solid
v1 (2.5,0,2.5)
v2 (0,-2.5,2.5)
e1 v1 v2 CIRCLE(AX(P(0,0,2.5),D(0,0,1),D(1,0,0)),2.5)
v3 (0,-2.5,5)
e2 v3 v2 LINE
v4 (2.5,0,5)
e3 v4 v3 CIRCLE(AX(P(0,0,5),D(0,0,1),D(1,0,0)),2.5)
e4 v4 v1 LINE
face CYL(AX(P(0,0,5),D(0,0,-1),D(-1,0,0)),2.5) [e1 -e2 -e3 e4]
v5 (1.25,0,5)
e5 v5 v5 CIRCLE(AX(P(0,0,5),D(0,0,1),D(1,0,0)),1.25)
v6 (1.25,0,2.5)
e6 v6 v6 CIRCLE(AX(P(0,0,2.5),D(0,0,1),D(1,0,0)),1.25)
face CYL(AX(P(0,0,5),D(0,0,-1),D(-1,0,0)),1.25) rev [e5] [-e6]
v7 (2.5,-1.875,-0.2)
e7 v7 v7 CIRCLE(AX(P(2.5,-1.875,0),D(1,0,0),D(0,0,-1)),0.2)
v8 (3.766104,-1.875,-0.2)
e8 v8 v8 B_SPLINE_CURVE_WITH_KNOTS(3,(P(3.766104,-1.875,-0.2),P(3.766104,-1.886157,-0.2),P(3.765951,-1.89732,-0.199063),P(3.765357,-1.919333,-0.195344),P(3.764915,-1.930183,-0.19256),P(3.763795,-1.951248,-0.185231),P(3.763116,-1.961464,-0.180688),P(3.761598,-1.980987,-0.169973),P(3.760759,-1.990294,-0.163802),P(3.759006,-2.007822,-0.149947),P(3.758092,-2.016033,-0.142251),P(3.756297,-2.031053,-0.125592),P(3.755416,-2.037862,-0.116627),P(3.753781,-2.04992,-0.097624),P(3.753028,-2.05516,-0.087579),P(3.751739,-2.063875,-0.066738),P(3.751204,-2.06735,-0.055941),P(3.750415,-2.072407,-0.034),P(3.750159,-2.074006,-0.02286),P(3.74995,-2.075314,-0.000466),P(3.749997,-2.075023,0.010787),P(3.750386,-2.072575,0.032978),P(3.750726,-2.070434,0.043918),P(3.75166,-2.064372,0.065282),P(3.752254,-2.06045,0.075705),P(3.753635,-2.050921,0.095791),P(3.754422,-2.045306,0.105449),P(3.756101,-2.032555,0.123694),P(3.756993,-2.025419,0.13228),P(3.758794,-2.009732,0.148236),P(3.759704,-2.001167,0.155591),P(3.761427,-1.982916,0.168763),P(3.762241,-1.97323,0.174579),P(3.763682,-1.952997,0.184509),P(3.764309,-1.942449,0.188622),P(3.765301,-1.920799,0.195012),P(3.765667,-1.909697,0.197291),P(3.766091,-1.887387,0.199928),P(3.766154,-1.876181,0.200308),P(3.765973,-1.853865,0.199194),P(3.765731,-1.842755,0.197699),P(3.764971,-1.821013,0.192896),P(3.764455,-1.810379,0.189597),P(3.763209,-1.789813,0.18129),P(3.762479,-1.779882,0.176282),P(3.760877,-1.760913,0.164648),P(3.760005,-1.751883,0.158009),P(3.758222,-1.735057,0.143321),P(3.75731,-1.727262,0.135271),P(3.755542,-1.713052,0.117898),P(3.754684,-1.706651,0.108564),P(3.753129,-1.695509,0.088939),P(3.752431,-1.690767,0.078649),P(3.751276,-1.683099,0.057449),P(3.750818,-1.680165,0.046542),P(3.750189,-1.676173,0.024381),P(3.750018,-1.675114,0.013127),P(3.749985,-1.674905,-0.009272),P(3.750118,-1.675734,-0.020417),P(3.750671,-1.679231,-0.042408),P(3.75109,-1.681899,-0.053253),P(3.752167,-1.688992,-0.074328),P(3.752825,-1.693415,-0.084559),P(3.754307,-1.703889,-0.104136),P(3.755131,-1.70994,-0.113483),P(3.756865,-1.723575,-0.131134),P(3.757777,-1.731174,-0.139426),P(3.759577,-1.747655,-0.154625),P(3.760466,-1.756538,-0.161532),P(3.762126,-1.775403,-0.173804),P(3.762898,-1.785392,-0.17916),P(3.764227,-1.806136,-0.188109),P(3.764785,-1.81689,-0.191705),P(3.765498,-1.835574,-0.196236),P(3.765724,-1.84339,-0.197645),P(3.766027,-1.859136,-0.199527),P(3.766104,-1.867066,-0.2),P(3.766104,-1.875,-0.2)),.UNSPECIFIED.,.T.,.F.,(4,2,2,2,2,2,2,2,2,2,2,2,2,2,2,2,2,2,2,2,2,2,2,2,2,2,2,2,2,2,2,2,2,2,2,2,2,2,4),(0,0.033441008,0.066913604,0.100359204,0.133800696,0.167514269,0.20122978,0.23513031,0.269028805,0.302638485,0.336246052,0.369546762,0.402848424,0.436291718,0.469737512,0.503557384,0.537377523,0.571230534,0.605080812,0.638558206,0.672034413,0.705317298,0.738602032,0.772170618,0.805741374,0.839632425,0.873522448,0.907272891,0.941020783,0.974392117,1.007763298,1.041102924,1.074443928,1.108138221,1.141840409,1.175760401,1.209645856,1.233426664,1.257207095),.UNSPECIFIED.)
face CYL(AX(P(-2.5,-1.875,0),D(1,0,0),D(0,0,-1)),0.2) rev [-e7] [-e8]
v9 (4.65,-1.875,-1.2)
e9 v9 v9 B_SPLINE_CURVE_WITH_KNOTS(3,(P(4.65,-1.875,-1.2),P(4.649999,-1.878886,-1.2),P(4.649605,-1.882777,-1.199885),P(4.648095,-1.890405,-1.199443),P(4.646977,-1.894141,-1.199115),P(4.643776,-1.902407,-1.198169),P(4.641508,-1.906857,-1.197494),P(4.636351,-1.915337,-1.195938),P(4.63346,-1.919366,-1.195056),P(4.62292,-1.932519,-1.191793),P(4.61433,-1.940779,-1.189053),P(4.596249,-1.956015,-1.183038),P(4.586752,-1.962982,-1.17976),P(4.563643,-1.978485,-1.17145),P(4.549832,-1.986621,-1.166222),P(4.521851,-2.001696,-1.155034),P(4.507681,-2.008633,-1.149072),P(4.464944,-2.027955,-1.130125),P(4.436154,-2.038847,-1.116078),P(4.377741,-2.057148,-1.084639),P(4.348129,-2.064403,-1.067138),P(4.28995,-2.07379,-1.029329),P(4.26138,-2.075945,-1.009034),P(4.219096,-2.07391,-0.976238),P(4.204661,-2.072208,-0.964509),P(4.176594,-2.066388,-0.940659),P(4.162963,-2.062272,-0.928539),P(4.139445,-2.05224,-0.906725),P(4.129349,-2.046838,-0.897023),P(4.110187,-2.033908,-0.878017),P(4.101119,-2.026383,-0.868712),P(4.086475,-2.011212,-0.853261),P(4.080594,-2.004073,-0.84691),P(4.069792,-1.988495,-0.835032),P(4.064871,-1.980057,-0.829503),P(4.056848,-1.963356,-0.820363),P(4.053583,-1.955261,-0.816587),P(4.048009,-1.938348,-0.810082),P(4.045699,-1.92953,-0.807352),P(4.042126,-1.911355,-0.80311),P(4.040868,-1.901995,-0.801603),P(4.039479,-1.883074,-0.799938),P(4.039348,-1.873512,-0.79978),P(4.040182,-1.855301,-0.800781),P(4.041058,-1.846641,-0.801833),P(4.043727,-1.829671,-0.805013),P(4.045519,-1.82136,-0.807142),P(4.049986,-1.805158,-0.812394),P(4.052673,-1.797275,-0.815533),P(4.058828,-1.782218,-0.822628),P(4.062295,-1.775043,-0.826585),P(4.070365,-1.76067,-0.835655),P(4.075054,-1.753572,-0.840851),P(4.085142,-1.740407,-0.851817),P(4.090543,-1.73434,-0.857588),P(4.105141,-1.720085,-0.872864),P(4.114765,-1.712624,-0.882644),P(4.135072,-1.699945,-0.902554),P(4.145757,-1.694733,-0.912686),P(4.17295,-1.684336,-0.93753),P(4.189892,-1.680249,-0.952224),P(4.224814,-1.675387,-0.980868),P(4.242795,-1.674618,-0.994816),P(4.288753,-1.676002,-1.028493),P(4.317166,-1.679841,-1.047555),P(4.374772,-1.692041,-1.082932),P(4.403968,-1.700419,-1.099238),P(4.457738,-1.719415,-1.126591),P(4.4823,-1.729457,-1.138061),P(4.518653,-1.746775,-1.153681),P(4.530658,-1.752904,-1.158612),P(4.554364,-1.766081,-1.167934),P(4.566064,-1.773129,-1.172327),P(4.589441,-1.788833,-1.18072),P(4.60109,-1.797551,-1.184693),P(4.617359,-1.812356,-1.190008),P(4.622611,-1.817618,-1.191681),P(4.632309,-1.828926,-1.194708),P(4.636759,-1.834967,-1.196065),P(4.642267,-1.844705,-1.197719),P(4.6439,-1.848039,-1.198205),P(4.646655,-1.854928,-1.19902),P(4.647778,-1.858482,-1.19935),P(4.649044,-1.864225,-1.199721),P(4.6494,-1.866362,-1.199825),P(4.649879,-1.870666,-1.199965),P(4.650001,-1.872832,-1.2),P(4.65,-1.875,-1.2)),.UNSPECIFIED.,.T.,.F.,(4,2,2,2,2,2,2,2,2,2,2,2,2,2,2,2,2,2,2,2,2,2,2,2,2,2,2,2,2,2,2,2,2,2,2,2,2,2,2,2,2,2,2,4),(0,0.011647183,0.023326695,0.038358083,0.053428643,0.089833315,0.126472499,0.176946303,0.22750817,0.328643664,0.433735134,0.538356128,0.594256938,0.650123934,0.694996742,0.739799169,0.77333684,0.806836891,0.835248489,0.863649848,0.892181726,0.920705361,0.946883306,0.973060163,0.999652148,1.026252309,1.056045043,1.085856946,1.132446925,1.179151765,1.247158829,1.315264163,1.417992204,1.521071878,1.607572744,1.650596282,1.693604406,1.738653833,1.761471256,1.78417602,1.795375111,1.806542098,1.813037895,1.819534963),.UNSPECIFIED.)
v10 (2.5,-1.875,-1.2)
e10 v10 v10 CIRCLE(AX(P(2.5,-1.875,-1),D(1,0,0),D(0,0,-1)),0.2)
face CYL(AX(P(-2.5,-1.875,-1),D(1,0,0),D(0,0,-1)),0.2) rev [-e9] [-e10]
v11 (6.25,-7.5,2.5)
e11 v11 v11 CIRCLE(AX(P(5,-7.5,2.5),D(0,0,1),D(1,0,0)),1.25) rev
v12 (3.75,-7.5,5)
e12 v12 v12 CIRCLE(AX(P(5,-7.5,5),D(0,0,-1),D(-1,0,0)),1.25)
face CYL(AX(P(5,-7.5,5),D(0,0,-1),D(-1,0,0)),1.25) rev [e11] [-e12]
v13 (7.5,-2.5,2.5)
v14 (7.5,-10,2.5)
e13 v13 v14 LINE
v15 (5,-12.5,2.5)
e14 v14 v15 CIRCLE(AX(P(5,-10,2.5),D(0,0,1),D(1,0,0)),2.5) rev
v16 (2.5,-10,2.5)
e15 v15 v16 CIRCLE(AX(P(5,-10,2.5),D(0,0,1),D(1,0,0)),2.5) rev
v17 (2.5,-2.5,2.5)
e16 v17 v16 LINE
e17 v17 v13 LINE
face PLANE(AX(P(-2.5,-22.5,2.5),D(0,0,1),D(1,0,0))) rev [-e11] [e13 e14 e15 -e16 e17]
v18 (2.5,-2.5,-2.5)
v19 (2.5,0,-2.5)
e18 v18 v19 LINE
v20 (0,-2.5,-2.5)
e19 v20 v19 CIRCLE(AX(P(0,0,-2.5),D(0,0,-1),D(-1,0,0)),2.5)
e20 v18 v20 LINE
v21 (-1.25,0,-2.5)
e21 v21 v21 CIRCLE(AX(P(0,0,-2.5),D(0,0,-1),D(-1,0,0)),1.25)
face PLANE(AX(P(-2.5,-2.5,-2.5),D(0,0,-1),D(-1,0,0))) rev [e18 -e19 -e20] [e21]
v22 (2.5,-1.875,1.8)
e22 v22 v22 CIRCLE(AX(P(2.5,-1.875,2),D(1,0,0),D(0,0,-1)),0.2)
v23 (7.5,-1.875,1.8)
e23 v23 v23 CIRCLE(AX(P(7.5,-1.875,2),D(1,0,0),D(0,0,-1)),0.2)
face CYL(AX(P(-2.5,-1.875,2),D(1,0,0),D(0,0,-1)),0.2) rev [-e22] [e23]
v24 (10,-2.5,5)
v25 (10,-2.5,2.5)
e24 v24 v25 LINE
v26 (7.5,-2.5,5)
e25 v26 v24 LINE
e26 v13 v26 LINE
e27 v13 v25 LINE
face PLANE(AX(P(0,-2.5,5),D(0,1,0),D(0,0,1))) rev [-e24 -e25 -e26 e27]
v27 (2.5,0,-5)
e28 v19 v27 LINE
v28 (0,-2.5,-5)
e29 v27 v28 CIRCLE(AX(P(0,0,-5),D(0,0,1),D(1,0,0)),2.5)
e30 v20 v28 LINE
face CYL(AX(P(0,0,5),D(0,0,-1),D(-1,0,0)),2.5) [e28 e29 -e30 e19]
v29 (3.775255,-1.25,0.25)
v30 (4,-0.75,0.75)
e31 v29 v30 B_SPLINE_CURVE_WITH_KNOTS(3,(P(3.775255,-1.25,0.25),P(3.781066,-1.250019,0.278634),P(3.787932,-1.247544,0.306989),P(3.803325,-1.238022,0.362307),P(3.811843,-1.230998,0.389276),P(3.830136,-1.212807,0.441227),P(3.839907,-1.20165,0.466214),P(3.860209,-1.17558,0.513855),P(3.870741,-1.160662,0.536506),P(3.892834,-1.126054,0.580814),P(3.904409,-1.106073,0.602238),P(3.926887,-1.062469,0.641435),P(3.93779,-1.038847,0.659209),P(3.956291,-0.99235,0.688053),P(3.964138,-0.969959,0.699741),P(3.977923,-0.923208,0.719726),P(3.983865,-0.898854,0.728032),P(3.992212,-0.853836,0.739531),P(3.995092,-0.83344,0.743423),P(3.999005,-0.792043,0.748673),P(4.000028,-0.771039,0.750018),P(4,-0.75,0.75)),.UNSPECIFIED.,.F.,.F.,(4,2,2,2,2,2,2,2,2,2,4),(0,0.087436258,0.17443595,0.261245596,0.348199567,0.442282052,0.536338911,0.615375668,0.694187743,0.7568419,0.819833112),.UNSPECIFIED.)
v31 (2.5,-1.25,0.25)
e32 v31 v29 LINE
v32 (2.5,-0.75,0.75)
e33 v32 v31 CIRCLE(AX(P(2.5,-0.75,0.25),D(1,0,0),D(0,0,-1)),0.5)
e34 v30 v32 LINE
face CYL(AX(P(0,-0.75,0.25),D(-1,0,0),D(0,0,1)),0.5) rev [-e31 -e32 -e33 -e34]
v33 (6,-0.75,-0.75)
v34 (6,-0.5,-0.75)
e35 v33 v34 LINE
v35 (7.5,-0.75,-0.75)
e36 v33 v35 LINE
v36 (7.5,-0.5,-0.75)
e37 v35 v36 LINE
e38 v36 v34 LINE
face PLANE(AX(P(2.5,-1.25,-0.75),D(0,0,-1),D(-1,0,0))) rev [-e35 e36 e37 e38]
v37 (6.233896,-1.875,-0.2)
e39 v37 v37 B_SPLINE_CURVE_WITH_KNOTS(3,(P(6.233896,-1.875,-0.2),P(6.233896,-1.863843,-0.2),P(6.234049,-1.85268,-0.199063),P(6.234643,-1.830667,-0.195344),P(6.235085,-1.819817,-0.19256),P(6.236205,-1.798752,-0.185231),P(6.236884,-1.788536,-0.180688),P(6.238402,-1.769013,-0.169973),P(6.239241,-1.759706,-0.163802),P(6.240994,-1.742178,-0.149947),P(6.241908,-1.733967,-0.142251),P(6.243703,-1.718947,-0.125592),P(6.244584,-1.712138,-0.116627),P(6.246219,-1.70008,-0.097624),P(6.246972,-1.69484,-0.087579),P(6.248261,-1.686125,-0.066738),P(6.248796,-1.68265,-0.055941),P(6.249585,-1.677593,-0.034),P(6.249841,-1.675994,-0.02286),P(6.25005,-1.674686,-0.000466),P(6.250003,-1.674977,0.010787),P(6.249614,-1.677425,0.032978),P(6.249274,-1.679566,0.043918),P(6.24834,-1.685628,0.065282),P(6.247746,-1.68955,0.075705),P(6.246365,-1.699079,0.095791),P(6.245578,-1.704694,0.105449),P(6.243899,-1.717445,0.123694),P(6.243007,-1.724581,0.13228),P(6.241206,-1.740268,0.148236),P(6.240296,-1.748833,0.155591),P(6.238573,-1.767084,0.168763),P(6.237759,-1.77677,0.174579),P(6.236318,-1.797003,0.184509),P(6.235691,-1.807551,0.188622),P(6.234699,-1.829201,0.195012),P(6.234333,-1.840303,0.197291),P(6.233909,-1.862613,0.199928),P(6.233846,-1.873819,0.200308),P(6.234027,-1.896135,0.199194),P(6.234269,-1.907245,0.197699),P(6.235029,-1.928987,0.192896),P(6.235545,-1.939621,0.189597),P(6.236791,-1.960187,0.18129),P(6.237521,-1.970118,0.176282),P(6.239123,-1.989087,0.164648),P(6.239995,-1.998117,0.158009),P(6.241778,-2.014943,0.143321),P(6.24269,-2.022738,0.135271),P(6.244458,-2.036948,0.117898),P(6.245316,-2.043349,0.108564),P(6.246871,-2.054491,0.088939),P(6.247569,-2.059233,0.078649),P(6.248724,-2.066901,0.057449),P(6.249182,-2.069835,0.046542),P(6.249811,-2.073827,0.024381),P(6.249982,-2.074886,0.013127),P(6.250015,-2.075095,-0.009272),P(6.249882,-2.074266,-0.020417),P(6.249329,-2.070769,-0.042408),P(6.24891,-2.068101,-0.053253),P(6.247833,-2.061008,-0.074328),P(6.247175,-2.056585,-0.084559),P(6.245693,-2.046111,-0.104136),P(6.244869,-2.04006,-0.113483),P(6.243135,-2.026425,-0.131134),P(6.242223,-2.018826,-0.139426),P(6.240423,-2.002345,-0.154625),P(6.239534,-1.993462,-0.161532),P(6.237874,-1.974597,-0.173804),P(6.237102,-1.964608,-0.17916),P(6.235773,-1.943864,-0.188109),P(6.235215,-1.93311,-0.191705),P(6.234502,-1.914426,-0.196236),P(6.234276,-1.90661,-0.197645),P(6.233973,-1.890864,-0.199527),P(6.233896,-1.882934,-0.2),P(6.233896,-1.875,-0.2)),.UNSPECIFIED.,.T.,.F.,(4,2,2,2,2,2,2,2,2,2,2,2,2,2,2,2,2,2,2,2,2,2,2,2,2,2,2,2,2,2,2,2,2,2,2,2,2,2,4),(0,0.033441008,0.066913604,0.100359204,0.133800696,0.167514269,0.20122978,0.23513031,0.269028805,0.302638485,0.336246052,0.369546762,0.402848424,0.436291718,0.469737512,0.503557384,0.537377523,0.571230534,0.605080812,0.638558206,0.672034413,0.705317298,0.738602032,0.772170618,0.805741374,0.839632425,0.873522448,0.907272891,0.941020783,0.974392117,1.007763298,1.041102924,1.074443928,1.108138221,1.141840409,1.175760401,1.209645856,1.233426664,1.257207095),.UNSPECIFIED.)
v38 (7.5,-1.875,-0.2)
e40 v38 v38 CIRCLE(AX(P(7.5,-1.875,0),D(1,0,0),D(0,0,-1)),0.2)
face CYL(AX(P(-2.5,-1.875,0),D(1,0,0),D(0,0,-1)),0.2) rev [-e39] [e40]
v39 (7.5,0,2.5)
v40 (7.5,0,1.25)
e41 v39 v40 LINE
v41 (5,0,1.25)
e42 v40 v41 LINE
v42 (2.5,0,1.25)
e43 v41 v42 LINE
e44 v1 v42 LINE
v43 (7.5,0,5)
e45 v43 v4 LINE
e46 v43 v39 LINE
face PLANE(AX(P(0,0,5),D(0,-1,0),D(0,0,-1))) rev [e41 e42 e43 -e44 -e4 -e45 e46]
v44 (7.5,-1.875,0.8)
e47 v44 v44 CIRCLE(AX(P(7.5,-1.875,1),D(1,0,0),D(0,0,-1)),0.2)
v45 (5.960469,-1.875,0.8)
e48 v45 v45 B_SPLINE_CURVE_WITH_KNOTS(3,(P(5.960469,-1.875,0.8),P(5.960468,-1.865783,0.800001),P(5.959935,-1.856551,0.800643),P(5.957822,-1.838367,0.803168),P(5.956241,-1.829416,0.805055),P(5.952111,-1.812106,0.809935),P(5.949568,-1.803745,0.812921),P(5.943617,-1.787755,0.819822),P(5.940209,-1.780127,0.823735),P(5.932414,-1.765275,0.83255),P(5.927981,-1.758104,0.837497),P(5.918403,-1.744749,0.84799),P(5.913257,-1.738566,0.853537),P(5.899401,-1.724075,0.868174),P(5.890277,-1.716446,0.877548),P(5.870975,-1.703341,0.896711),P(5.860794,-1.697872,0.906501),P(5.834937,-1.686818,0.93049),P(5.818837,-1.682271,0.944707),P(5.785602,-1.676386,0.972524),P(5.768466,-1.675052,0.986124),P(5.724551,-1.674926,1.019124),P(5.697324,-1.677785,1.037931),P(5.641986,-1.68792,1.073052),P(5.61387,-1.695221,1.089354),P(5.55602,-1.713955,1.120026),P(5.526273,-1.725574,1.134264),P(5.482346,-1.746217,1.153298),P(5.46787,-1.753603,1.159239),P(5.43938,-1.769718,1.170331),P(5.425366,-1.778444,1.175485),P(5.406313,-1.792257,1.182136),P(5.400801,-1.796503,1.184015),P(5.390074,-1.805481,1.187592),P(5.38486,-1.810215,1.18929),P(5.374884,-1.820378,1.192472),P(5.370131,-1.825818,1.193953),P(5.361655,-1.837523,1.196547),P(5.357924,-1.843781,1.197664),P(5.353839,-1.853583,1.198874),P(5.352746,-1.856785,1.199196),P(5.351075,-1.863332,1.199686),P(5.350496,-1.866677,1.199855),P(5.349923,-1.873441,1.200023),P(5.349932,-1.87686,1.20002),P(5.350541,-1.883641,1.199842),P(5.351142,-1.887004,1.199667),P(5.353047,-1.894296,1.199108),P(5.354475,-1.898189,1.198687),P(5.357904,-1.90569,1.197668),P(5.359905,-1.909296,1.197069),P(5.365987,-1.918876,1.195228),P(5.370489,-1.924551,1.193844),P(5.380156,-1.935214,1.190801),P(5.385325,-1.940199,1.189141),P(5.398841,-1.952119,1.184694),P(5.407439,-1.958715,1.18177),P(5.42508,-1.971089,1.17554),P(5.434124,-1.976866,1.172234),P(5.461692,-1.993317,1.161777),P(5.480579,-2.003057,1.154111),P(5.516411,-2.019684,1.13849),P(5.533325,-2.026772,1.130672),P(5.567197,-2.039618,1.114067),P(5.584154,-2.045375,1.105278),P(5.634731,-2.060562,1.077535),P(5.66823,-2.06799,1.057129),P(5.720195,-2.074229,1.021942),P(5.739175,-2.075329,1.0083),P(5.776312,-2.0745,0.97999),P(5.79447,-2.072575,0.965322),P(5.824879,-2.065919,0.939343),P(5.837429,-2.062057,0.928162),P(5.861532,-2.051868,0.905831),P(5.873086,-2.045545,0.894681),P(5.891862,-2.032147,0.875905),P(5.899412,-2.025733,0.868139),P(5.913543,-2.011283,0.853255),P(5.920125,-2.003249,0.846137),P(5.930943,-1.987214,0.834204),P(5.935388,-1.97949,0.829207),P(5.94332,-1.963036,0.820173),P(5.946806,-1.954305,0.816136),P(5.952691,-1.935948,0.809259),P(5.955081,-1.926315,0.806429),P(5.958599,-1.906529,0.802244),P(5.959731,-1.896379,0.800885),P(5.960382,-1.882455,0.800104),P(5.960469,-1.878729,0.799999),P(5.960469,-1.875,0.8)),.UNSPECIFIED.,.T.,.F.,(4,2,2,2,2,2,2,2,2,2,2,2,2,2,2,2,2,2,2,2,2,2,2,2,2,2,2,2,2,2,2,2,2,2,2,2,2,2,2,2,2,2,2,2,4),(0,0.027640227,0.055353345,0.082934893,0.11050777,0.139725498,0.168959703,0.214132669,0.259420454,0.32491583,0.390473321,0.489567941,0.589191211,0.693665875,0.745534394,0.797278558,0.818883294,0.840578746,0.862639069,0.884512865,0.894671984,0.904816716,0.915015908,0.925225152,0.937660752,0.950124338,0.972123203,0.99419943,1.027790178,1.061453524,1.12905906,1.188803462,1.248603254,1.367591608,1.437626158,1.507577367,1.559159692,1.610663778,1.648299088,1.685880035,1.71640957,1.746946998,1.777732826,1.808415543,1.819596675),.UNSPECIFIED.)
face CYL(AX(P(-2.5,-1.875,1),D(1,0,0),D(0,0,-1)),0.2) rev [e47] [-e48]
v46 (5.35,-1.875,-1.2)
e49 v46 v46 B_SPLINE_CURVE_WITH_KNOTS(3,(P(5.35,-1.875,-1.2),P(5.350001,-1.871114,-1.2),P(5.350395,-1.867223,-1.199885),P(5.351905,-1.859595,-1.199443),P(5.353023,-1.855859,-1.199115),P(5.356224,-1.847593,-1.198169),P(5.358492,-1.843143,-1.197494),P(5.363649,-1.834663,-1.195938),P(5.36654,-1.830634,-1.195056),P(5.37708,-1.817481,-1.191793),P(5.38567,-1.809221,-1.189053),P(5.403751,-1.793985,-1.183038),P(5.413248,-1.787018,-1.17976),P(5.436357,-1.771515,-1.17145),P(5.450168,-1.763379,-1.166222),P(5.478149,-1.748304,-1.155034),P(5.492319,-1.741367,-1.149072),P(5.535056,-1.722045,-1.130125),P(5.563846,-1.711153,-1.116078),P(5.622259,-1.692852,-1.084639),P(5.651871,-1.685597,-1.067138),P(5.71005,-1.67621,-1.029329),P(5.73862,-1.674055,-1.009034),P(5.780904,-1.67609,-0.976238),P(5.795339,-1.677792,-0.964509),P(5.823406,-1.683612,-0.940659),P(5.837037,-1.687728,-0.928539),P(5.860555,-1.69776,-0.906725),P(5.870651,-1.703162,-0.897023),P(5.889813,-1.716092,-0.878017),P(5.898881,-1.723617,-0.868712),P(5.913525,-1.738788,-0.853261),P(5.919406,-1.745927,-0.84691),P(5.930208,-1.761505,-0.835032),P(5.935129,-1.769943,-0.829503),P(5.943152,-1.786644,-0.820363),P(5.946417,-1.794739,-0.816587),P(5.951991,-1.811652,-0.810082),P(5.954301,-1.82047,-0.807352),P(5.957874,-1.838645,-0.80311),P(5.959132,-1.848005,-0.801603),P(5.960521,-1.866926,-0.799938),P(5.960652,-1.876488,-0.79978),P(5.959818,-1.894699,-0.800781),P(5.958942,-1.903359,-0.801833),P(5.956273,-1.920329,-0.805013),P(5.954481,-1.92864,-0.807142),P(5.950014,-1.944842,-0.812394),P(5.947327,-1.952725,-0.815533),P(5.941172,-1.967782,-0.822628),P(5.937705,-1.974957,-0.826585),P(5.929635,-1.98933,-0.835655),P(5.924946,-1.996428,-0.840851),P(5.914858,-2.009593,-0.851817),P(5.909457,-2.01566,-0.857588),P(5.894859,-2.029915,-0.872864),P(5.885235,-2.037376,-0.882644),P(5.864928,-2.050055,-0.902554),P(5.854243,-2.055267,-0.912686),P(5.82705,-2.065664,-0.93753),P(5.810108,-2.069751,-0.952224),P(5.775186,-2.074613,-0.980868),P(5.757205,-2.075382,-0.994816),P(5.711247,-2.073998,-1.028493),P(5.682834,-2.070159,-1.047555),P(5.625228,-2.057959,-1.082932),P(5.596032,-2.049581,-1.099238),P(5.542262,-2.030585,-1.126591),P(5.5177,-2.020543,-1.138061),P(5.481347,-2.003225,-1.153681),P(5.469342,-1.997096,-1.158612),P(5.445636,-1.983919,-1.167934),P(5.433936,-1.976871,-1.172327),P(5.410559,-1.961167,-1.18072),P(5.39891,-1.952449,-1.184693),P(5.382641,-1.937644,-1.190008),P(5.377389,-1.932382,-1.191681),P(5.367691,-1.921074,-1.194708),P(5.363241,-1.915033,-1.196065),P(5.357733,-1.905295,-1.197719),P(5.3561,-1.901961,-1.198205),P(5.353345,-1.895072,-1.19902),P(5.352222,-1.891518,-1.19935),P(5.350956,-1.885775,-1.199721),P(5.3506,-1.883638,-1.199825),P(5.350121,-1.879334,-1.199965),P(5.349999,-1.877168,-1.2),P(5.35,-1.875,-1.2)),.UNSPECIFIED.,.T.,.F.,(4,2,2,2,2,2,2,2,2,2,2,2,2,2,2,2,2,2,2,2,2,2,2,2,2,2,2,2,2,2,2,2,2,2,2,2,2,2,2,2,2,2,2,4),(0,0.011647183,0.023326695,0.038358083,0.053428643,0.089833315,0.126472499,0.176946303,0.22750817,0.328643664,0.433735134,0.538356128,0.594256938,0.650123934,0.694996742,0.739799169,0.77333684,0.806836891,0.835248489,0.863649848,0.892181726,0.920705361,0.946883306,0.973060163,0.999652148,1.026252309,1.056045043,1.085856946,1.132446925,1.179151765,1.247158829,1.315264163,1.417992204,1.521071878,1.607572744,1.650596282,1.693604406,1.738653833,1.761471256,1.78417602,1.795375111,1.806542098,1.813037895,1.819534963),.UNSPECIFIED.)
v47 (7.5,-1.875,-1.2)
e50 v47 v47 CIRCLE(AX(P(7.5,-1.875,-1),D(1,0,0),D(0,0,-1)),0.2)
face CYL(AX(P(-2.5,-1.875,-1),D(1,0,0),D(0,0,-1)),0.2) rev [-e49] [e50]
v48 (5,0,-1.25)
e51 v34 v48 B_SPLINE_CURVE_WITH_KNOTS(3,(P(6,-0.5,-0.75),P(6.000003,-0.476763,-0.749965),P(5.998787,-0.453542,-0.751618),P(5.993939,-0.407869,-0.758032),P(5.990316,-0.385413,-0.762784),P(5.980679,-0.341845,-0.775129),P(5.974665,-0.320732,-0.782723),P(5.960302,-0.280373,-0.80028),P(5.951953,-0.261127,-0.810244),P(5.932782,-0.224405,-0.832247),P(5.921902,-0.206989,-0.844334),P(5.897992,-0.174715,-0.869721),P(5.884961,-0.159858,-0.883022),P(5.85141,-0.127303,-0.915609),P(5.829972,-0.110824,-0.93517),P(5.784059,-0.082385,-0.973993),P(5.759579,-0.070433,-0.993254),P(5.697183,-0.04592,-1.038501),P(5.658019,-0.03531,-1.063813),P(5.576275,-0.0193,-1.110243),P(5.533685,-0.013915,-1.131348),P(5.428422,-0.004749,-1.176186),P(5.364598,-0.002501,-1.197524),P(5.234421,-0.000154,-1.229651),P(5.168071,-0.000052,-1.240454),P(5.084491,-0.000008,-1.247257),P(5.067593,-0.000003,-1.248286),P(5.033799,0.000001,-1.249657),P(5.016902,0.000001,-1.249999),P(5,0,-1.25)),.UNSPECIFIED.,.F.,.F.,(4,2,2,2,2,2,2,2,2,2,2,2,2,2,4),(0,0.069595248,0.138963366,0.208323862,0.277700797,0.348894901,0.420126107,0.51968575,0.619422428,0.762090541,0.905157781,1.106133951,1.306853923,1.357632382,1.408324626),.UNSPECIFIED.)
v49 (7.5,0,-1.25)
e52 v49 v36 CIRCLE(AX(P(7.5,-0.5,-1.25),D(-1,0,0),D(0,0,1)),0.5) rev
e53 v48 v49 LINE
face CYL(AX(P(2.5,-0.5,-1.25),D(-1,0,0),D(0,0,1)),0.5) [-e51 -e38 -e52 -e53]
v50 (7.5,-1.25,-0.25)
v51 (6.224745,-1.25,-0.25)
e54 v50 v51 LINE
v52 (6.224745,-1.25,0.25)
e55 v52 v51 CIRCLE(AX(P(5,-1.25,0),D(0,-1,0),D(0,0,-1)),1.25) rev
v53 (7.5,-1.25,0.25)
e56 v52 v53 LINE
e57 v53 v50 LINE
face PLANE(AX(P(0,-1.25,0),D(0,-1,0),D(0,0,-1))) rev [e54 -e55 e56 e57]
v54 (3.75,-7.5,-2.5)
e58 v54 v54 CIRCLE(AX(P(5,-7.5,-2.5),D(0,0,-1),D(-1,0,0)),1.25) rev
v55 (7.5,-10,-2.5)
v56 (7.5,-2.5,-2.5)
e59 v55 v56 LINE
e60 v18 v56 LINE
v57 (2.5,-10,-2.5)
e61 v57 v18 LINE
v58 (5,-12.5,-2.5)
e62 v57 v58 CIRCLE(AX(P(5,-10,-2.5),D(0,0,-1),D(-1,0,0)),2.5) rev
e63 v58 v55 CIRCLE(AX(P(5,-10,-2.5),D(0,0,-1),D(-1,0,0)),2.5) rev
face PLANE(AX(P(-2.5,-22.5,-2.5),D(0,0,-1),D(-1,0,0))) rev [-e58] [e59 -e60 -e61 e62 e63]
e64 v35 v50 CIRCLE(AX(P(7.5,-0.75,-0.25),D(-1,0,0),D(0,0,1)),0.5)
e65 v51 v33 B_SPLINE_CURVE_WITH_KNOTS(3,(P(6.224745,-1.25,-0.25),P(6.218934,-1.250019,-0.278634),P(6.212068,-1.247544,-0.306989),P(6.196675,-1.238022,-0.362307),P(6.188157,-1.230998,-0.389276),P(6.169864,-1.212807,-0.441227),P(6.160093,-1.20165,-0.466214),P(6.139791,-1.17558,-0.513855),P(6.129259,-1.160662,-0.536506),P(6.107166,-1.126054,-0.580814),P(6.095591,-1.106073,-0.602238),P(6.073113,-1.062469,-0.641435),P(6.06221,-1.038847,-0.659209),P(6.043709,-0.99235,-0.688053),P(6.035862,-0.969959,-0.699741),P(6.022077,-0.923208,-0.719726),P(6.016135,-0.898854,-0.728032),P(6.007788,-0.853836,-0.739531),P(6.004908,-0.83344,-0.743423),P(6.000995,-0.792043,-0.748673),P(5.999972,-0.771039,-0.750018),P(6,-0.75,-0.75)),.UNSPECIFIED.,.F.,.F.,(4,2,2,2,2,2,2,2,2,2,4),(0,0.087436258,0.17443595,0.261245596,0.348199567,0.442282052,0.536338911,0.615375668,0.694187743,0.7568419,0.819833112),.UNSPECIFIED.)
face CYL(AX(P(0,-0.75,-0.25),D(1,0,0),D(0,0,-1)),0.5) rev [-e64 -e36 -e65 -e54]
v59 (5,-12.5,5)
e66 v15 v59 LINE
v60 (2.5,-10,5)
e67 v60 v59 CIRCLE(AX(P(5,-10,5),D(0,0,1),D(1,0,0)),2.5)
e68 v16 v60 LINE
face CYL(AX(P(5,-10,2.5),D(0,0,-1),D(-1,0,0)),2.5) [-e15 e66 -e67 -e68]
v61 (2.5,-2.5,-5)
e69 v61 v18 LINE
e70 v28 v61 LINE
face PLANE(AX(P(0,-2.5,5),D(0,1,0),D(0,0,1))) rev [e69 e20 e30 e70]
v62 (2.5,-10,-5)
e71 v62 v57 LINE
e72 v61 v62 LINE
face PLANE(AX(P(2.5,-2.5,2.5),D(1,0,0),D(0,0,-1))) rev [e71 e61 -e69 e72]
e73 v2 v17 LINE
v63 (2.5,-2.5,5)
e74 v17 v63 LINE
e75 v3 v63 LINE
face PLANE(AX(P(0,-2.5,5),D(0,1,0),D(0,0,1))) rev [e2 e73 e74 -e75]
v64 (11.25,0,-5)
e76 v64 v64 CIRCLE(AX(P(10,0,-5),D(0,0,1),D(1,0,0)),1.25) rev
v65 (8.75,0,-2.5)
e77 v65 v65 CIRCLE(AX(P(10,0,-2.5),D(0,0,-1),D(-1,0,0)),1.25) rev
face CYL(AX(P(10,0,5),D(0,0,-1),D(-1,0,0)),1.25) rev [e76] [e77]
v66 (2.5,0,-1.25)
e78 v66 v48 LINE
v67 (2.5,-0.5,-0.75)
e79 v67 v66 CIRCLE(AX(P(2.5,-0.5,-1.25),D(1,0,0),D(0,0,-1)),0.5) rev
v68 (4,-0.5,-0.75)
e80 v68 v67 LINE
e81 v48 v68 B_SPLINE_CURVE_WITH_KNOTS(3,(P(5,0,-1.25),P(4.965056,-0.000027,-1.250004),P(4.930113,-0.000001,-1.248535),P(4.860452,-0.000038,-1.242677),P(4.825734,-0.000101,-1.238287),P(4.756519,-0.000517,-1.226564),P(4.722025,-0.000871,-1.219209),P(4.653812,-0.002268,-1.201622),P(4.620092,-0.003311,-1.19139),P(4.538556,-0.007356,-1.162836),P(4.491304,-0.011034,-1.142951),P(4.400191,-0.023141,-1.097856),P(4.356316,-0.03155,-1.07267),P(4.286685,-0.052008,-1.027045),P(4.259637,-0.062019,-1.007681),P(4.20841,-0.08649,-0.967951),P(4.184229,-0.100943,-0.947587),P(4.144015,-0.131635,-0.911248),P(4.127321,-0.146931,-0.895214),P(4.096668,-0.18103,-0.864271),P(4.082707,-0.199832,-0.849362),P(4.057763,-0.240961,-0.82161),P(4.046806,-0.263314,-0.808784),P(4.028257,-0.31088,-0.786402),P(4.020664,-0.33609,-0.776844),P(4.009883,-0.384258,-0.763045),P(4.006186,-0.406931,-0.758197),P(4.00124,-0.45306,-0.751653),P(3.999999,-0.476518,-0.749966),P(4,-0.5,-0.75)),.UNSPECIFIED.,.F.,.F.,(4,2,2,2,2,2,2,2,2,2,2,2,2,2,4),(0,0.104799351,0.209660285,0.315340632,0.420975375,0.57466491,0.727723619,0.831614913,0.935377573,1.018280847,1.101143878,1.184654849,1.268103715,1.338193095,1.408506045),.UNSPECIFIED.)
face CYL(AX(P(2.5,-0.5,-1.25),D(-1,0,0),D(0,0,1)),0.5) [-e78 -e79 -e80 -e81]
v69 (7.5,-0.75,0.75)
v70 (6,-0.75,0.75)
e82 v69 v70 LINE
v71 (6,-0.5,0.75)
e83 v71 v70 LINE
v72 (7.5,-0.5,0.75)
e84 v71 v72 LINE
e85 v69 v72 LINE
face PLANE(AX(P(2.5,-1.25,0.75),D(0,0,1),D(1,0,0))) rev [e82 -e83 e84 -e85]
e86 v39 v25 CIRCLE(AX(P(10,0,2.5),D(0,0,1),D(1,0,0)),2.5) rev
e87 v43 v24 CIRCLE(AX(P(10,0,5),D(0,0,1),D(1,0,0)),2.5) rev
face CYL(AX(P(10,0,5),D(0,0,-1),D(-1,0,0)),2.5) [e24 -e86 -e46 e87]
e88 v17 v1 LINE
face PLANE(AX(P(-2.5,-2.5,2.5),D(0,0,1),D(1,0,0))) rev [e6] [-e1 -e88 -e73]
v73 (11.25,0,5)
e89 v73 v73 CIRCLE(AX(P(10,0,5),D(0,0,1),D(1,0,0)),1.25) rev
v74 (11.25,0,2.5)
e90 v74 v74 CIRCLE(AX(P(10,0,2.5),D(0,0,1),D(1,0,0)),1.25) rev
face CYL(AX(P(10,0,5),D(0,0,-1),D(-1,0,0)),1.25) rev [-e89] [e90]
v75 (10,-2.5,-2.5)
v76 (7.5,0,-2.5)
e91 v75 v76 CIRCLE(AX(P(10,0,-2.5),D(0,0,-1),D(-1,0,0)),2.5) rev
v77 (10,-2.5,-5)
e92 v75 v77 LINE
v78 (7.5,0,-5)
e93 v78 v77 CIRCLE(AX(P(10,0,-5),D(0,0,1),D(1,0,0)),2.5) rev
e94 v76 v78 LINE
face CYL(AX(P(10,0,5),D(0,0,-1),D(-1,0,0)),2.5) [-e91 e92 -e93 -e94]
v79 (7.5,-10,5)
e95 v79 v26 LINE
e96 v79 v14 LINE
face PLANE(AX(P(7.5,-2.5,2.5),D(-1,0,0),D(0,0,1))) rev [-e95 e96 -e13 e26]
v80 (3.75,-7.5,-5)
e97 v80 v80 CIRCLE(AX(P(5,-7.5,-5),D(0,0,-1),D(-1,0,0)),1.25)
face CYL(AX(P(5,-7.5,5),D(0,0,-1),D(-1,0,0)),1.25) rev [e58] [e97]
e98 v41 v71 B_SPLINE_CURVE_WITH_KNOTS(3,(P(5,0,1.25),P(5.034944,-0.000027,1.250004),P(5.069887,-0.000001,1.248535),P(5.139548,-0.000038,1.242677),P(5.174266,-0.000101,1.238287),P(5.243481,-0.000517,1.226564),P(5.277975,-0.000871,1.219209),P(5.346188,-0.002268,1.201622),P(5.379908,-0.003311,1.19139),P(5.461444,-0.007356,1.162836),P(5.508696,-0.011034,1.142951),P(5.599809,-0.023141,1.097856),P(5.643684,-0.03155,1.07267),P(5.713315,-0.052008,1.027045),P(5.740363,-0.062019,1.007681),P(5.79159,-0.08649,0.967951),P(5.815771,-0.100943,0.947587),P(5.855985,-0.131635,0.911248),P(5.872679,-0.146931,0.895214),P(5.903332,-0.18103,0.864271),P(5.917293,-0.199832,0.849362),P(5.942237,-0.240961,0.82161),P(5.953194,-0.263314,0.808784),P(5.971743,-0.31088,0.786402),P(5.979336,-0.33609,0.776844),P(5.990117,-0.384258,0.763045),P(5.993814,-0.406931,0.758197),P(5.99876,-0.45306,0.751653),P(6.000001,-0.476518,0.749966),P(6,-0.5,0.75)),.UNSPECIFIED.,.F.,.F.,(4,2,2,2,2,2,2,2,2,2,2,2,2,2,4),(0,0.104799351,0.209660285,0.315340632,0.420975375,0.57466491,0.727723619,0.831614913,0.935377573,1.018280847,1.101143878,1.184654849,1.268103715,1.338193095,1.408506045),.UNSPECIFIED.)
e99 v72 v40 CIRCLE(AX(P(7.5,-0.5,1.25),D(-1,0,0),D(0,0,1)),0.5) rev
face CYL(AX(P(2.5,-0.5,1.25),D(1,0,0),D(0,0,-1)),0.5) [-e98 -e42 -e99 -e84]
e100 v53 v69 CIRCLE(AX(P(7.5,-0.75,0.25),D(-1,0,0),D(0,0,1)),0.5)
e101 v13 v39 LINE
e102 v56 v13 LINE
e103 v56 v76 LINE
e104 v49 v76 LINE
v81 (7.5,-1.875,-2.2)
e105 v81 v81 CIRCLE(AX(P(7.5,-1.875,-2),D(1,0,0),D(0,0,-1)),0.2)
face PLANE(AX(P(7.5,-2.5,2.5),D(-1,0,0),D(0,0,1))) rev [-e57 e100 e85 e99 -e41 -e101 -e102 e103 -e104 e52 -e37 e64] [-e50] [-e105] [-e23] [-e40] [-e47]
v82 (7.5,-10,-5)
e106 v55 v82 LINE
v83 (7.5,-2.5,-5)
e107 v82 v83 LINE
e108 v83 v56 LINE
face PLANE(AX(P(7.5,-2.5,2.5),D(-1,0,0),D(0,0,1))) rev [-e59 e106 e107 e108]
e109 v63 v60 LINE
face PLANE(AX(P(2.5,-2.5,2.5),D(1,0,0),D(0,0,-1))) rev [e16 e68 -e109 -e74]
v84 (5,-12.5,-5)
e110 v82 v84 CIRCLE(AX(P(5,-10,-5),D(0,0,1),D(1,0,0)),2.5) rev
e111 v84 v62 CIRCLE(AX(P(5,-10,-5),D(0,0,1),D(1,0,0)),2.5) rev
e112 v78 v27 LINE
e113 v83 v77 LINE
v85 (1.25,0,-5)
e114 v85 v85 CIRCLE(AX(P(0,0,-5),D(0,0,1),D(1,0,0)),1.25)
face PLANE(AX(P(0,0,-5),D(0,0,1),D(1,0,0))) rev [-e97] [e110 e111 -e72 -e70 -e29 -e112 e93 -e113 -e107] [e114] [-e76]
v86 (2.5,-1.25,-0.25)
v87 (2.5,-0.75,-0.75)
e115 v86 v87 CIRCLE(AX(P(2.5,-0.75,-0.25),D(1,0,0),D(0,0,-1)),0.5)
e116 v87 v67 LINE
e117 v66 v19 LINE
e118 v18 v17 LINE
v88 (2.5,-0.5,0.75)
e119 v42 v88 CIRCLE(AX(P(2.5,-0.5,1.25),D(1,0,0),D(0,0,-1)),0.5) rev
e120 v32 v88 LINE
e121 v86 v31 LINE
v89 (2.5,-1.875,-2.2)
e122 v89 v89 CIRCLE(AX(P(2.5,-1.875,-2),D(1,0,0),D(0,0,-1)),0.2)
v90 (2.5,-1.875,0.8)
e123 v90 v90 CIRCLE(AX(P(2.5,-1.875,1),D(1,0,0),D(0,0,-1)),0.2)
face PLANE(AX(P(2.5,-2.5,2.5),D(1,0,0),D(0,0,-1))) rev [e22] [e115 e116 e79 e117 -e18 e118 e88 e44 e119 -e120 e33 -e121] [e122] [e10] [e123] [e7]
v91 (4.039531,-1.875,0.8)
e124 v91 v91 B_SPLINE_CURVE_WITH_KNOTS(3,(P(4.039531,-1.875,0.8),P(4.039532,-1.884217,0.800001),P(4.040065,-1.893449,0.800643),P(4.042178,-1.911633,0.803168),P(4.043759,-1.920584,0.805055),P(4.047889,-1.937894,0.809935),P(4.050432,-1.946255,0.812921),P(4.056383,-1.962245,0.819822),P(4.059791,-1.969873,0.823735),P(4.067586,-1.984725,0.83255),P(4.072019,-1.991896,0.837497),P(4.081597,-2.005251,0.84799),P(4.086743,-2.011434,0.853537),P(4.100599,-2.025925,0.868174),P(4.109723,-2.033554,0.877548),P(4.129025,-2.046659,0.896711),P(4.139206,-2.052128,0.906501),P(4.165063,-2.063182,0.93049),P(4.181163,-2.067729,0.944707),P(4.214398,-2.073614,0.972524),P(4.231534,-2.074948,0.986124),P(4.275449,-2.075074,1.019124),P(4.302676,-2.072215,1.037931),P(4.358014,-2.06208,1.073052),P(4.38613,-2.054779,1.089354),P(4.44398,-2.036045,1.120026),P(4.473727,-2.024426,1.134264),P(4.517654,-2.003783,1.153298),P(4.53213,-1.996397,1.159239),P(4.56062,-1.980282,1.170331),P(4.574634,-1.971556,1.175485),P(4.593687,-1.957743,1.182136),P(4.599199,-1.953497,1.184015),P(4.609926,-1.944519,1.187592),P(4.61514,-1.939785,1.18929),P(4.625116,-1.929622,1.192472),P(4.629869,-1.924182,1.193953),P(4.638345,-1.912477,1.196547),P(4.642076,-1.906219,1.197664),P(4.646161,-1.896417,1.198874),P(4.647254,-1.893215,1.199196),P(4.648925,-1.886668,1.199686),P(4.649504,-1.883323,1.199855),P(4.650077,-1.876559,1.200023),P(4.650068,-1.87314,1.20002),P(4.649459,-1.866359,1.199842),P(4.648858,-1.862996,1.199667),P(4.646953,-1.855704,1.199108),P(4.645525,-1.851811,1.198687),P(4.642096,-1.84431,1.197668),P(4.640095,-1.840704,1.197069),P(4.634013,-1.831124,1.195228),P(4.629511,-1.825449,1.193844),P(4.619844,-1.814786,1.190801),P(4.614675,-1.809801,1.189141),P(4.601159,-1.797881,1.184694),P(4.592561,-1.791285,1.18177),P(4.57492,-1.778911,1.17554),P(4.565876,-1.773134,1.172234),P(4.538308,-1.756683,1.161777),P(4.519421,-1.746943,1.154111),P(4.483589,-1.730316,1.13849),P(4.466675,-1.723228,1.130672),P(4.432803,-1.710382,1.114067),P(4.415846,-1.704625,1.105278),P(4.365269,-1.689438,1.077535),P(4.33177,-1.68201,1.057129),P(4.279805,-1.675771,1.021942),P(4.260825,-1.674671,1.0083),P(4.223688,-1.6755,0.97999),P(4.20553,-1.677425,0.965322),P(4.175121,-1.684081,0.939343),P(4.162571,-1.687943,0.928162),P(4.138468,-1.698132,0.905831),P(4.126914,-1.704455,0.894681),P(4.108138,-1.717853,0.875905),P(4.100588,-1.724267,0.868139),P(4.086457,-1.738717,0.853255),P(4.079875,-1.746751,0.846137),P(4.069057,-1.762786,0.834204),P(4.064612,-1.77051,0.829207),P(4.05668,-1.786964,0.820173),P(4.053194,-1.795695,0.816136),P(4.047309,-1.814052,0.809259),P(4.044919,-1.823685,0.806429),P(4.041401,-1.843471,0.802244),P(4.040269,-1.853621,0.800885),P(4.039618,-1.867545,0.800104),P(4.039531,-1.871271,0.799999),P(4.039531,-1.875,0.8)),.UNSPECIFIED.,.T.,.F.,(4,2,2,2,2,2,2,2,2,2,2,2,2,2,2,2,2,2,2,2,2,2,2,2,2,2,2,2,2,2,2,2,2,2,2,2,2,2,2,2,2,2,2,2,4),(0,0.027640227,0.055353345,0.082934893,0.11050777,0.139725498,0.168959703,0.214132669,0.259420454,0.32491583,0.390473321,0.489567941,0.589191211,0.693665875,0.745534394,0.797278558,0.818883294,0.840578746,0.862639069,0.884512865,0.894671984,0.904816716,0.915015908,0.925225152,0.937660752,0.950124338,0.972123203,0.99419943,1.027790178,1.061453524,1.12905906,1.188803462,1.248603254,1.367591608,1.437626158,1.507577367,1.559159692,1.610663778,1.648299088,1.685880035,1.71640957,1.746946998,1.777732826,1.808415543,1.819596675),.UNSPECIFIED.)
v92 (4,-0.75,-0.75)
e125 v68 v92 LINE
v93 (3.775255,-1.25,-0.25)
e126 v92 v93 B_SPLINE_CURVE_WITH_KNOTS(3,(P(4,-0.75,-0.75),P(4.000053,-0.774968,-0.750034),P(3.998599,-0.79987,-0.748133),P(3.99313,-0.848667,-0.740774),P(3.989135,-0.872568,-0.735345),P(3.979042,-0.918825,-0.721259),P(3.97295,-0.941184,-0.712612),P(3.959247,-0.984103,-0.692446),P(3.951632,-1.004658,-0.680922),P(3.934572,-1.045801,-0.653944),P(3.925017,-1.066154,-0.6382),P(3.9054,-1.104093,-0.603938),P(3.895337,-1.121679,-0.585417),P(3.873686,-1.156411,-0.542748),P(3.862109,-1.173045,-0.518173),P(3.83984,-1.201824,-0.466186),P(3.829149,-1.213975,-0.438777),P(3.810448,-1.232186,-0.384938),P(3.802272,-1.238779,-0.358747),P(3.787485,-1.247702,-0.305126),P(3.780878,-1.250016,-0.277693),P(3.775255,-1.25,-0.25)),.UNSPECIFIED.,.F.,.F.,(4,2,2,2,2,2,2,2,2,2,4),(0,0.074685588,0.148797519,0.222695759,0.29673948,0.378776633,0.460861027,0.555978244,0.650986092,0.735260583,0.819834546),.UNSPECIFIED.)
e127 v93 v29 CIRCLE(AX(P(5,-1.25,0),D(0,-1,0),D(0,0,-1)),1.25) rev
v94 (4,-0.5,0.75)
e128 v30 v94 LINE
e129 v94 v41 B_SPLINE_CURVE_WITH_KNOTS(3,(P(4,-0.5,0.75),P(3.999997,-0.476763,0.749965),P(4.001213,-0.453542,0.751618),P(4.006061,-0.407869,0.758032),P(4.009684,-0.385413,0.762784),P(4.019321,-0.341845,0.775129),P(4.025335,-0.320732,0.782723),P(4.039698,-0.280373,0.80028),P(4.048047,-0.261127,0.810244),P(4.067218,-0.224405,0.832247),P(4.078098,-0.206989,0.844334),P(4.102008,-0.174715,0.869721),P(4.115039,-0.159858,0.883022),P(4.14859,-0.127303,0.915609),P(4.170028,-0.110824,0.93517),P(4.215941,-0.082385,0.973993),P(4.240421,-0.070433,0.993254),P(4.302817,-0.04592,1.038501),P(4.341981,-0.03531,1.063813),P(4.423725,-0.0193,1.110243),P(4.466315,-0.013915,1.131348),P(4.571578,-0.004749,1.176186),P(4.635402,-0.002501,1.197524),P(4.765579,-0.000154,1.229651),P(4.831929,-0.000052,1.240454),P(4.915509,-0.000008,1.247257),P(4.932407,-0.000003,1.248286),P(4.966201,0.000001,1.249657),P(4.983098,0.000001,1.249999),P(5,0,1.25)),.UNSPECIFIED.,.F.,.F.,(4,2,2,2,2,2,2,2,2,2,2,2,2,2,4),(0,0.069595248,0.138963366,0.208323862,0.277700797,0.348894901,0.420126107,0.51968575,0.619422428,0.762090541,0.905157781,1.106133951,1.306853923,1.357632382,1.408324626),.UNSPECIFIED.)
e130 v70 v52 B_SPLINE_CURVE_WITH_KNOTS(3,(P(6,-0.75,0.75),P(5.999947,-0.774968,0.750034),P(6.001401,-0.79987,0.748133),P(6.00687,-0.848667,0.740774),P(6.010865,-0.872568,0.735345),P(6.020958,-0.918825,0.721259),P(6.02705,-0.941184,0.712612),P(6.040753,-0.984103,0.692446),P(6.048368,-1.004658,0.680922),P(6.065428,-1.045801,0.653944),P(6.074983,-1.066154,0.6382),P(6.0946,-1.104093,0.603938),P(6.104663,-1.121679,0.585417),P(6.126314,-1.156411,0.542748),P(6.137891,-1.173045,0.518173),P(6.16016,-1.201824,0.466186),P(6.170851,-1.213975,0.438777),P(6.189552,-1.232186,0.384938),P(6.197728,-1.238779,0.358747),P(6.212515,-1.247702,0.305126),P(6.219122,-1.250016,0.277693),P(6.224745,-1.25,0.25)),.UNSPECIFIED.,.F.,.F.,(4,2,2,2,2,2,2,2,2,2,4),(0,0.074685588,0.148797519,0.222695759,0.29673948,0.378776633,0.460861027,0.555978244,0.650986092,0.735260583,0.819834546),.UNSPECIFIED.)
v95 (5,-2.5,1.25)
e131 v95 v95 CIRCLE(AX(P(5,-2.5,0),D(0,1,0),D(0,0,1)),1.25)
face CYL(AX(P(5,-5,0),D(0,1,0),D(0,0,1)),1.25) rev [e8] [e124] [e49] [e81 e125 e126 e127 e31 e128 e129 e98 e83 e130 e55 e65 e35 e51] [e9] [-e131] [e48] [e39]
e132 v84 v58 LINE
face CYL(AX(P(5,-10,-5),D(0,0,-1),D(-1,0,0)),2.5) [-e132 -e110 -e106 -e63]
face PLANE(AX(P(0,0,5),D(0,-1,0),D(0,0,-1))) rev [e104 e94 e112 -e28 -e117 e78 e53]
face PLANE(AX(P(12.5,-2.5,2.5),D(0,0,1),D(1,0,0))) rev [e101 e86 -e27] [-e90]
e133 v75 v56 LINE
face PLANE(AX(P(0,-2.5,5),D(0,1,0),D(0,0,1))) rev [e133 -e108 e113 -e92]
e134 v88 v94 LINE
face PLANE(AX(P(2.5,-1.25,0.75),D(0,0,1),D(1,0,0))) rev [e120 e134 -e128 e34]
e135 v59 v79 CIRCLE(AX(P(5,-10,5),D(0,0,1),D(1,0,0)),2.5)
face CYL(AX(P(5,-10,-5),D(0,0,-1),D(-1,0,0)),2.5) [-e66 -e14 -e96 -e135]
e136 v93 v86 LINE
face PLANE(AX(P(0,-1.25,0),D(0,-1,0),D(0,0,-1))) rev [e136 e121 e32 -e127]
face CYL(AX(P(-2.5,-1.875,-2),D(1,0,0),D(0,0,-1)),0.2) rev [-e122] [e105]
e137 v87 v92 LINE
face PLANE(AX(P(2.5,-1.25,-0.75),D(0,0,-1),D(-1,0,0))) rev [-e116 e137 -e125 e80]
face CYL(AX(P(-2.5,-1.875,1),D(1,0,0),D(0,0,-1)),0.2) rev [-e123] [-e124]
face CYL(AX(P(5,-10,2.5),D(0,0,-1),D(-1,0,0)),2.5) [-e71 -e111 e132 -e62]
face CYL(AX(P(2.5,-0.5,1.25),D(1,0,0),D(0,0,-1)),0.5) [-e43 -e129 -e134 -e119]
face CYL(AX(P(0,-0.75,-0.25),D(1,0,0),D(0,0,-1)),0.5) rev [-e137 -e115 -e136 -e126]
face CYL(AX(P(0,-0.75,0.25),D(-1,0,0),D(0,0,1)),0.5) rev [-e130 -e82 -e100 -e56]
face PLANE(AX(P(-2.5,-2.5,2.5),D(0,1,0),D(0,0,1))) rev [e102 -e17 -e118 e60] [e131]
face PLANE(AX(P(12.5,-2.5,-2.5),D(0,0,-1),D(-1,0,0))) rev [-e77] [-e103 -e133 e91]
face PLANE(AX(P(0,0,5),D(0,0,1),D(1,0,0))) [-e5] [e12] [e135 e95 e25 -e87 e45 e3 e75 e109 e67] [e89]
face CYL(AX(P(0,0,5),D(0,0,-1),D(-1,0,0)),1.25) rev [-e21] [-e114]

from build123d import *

# Parameters (mm, degrees)
SKETCH1_R               = 1.25
BOSS_EXTRUDE1_DEPTH     = 5
SKETCH2_R               = 1.25
CUT_EXTRUDE1_DEPTH      = 5
CUT_EXTRUDE2_DEPTH      = 14.693063938
CUT_EXTRUDE2_DEPTH_BACK = 14.693063938
SKETCH4_W               = 5
SKETCH4_H               = 5
SKETCH5_W               = 5
SKETCH5_H               = 1.5
CUT_EXTRUDE3_DEPTH      = 1.25
SKETCH6_R               = 0.2
CUT_EXTRUDE4_DEPTH      = 12.456439237
FILLET1_R               = 0.5
SKETCH7_W               = 5
SKETCH7_H               = 10
BOSS_EXTRUDE2_DEPTH     = 10
SKETCH9_R               = 1.25
CUT_EXTRUDE6_DEPTH      = 10
SKETCH11_W              = 5
SKETCH11_H              = 20
CUT_EXTRUDE7_DEPTH      = 10
FILLET3_R               = 2.5


with BuildPart() as part:
    # Sketch1 → Boss-Extrude1 (new, symmetric)
    with BuildSketch(Plane.XY):
        with BuildLine():
            ThreePointArc((2.5, 0), (-1.767766953, 1.767766953), (0, -2.5))
            Line((0, -2.5), (10, -2.5))
            ThreePointArc((10, -2.5), (11.767766953, 1.767766953), (7.5, 0))
            Line((7.5, 0), (2.5, 0))
        make_face()
        with Locations((10, 0)):
            Circle(SKETCH1_R, mode=Mode.SUBTRACT)
        Circle(SKETCH1_R, mode=Mode.SUBTRACT)
    extrude(amount=BOSS_EXTRUDE1_DEPTH, both=True)

    # Sketch2 → Cut-Extrude1 (cut)
    with BuildSketch(Plane(origin=(0, 0, 0), x_dir=(1, 0, 0), z_dir=(0, 1, 0))):
        with Locations(Location((5, 0, 0), (0, 0, 270))):
            Circle(SKETCH2_R)
    extrude(amount=-CUT_EXTRUDE1_DEPTH, mode=Mode.SUBTRACT)

    # Sketch4 → Cut-Extrude2 (cut, two sides: drawn at the far end of the back side and taken through both)
    with BuildSketch(Plane(origin=(0, 0, 0), x_dir=(1, 0, 0), z_dir=(0, 1, 0)).offset(-CUT_EXTRUDE2_DEPTH_BACK)):
        Rectangle(SKETCH4_W, SKETCH4_H)
        with Locations((10, 0)):
            Rectangle(SKETCH4_W, SKETCH4_H)
    extrude(amount=CUT_EXTRUDE2_DEPTH + CUT_EXTRUDE2_DEPTH_BACK, mode=Mode.SUBTRACT)

    # Sketch5 → Cut-Extrude3 (cut)
    with BuildSketch(Plane(origin=(0, 0, 0), x_dir=(1, 0, 0), z_dir=(0, 1, 0))):
        with Locations((5, 0)):
            Rectangle(SKETCH5_W, SKETCH5_H)
    extrude(amount=-CUT_EXTRUDE3_DEPTH, mode=Mode.SUBTRACT)

    # Sketch6 → Cut-Extrude4 (cut, through all)
    with BuildSketch(Plane(origin=(7.5, 0, 0), x_dir=(0, 0, -1), z_dir=(1, 0, 0))):
        with Locations((0, -1.875)):
            Circle(SKETCH6_R)
        with Locations((1, -1.875)):
            Circle(SKETCH6_R)
        with Locations((2, -1.875)):
            Circle(SKETCH6_R)
        with Locations((-1, -1.875)):
            Circle(SKETCH6_R)
        with Locations((-2, -1.875)):
            Circle(SKETCH6_R)
    extrude(amount=-CUT_EXTRUDE4_DEPTH, mode=Mode.SUBTRACT)

    # Fillet1
    fillet1_edges = [part.edges().sort_by_distance(p)[0] for p in [
        (6.75, -1.25, 0.75),
        (3.25, -1.25, 0.75),
        (3.25, -1.25, -0.75),
        (6.75, -1.25, -0.75),
        (6.75, 0, 0.75),
        (6.75, 0, -0.75),
        (3.25, 0, 0.75),
        (3.25, 0, -0.75),
    ]]
    fillet(fillet1_edges, radius=FILLET1_R - 0.0001)  # a hair under: the kernel refuses the full size

    # Sketch7 → Boss-Extrude2 (add)
    with BuildSketch(Plane.XY.offset(5)):
        with Locations((5, -7.5)):
            Rectangle(SKETCH7_W, SKETCH7_H)
    extrude(amount=-BOSS_EXTRUDE2_DEPTH)

    # Sketch9 → Cut-Extrude6 (cut)
    with BuildSketch(Plane(origin=(0, 0, -5), x_dir=(-1, 0, 0), z_dir=(0, 0, -1))):
        with Locations((-5, -7.5)):
            Circle(SKETCH9_R)
    extrude(amount=-CUT_EXTRUDE6_DEPTH, mode=Mode.SUBTRACT)

    # Sketch11 → Cut-Extrude7 (cut)
    with BuildSketch(Plane(origin=(7.5, 0, 0), x_dir=(0, 0, -1), z_dir=(1, 0, 0))):
        with Locations((0, -12.5)):
            Rectangle(SKETCH11_W, SKETCH11_H)
    extrude(amount=-CUT_EXTRUDE7_DEPTH, mode=Mode.SUBTRACT)

    # Fillet3
    fillet3_edges = [part.edges().sort_by_distance(p)[0] for p in [
        (2.5, -12.5, 3.75),
        (7.5, -12.5, 3.75),
        (2.5, -12.5, -3.75),
        (7.5, -12.5, -3.75),
    ]]
    fillet(fillet3_edges, radius=FILLET3_R - 0.0001)  # a hair under: the kernel refuses the full size


solid = part.part
